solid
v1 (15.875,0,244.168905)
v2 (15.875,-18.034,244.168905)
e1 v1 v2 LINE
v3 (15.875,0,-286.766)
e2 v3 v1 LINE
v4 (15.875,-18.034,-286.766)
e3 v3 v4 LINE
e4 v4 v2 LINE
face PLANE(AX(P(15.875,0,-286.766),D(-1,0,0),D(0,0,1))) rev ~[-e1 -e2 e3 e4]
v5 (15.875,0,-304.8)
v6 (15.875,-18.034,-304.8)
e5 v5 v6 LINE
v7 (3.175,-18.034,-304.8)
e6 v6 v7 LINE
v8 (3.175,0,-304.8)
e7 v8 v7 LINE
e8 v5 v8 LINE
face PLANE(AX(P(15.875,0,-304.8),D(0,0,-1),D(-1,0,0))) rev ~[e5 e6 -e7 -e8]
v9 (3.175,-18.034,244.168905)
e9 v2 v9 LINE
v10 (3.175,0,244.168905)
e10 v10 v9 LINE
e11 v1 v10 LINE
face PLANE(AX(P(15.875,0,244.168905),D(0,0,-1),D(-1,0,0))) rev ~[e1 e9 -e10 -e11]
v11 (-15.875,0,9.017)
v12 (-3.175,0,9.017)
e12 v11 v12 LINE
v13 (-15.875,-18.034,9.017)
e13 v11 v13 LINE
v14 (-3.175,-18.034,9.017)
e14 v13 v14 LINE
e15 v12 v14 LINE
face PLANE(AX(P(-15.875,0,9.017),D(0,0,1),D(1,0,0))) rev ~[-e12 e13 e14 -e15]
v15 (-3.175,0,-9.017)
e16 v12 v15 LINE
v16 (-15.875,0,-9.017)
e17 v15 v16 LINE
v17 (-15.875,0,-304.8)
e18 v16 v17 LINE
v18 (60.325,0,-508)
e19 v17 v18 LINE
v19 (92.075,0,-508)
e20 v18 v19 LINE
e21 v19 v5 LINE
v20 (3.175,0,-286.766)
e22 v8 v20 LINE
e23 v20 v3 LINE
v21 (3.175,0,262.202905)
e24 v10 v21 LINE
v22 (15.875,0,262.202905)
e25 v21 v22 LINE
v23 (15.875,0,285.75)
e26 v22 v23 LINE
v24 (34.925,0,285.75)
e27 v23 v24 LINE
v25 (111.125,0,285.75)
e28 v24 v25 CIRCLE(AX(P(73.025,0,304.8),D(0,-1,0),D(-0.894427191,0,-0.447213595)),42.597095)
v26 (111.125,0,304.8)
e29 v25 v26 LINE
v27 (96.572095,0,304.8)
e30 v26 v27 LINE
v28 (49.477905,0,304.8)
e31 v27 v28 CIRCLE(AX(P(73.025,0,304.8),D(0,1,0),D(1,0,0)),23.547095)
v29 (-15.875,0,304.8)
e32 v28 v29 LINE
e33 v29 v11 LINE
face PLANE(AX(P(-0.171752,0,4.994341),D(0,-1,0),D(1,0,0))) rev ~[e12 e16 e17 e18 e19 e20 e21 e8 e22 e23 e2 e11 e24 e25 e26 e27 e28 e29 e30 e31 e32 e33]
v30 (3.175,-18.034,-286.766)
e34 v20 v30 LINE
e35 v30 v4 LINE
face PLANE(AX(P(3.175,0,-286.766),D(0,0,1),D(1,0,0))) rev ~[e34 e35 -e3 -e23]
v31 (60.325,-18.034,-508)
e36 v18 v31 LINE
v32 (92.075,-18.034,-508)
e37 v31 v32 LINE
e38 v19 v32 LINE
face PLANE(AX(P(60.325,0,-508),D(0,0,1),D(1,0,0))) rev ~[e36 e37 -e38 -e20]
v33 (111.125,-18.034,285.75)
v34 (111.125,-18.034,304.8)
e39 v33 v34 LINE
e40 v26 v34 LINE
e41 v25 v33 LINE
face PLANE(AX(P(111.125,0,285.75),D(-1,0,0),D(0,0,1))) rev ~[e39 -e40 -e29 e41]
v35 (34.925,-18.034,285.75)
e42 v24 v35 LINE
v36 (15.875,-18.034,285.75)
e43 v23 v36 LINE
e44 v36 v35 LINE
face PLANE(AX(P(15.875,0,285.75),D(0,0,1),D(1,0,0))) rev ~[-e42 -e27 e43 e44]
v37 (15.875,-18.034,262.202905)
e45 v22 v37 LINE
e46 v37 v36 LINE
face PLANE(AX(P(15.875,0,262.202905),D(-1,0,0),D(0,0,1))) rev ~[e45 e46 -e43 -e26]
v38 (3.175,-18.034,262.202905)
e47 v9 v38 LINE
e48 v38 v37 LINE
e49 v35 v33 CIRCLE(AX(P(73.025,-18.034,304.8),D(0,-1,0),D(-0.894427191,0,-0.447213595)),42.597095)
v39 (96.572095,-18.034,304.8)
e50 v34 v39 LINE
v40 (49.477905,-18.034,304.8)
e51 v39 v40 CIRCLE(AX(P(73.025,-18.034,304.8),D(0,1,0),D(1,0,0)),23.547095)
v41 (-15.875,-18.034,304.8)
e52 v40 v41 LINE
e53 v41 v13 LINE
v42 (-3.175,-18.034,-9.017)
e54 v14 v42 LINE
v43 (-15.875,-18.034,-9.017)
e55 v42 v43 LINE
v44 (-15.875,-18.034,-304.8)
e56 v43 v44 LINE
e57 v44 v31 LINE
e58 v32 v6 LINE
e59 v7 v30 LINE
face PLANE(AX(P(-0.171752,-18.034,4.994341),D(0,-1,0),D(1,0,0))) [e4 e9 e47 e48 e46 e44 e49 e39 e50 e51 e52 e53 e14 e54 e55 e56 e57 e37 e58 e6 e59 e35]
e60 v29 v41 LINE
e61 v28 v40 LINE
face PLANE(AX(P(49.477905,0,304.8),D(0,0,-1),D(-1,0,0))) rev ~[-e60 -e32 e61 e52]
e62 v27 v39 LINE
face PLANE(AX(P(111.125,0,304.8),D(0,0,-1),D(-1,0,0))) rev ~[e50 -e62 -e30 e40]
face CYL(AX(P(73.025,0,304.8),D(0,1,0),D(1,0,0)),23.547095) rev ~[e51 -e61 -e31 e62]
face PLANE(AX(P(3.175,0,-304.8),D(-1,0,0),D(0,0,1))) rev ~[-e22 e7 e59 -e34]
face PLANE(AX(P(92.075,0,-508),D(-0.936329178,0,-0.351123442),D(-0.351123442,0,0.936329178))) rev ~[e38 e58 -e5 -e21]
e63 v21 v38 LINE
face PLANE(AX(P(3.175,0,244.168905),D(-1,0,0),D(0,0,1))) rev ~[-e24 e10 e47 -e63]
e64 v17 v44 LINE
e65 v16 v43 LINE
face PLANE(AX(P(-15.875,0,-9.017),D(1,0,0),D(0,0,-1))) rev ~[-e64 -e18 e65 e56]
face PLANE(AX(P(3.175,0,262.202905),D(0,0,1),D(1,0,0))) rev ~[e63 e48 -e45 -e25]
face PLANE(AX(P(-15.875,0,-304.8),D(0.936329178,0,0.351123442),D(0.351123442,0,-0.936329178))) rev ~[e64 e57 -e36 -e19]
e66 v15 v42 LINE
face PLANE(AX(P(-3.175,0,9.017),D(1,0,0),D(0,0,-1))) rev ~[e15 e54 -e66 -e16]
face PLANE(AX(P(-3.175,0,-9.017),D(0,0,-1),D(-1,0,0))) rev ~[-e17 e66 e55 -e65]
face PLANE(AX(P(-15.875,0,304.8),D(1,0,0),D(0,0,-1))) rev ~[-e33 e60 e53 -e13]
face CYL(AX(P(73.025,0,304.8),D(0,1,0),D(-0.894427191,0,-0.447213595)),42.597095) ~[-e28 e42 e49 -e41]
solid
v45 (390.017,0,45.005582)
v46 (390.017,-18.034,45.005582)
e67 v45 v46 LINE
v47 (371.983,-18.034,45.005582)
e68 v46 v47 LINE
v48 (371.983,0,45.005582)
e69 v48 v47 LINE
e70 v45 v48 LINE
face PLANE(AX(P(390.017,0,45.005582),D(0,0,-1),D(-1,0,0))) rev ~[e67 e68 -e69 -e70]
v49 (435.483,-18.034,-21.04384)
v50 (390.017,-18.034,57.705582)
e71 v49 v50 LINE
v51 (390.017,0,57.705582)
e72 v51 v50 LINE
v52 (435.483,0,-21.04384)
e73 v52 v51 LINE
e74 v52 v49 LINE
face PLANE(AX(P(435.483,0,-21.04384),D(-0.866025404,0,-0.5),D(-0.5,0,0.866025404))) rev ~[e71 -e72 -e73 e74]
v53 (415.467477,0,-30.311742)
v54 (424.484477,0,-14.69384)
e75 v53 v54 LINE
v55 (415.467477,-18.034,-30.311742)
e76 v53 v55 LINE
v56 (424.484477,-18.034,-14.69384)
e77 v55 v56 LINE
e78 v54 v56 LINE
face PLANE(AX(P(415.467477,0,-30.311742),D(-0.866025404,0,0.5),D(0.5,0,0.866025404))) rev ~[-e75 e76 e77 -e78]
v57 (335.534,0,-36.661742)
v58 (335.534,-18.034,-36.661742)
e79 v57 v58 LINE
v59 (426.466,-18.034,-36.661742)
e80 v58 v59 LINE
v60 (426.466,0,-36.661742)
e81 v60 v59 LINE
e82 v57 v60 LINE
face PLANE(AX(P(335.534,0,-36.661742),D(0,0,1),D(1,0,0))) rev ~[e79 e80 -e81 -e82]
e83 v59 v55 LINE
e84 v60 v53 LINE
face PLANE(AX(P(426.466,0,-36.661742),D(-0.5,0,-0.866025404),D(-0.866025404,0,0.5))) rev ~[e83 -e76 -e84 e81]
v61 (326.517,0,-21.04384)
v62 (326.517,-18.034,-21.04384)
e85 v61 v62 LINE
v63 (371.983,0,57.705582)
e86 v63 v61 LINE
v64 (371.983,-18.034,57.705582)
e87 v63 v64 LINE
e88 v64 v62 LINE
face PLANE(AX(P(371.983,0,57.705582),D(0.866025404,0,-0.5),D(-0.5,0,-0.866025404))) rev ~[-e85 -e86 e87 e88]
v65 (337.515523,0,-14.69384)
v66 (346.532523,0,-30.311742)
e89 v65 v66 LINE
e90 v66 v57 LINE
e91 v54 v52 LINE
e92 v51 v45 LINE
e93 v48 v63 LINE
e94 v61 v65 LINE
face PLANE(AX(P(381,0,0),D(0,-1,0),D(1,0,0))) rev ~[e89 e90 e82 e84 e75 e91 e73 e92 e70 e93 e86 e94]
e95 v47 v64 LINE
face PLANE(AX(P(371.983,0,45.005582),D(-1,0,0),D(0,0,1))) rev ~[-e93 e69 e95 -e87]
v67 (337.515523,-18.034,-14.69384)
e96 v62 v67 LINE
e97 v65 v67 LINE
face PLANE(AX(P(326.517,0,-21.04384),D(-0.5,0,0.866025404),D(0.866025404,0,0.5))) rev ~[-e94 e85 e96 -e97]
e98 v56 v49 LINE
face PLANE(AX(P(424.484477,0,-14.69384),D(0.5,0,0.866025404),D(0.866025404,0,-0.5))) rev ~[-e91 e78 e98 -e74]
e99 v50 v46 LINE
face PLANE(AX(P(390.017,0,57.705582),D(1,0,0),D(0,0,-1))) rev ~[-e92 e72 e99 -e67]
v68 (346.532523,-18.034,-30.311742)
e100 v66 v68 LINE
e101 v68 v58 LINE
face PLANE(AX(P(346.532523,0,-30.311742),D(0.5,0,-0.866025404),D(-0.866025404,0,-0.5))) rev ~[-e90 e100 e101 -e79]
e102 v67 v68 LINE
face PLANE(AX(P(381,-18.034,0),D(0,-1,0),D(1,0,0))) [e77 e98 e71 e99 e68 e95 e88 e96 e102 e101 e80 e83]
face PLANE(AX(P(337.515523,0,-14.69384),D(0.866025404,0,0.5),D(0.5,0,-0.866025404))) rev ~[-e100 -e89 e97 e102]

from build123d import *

# Parameters (mm, degrees)
F1_W     = 19.05
F1_H     = 19.05
F2_DEPTH = 18.034


# Not quite as in the source:
# - a variable given as a bare number and used for a length is read in inches; the dataset says mm whatever the document's units were


with BuildPart() as f2:
    # F1 (on Front) → F2 (new body)
    with BuildSketch(Plane.XZ):
        Polygon((15.875, 285.75), (15.875, 304.8), (-15.875, 304.8), (-15.875, 9.017), (-3.175, 9.017), (-3.175, 0), (-3.175, -9.017), (-15.875, -9.017), (-15.875, -304.8), (3.175, -304.8), (3.175, -286.766), (15.875, -286.766), (15.875, 244.1689050286), (3.175, 244.1689050286), (3.175, 262.2029050286), (15.875, 262.2029050286), align=None)
        with BuildLine():
            Line((49.4779050286, 304.8), (34.925, 304.8))
            Line((34.925, 304.8), (34.925, 285.75))
            ThreePointArc((34.925, 285.75), (73.025, 262.2029050286), (111.125, 285.75))
            Line((111.125, 285.75), (111.125, 304.8))
            Line((111.125, 304.8), (96.5720949714, 304.8))
            ThreePointArc((96.5720949714, 304.8), (73.025, 281.2529050286), (49.4779050286, 304.8))
        make_face()
        with Locations((25.4, 295.275)):
            Rectangle(F1_W, F1_H)
        Polygon((3.175, -304.8), (-15.875, -304.8), (60.325, -508), (92.075, -508), (15.875, -304.8), align=None)
    extrude(amount=F2_DEPTH)


with BuildPart() as f2b:
    # F1 (on Front) → F2, piece 2 (new body)
    with BuildSketch(Plane.XZ):
        Polygon((435.483, -21.0438399617), (390.017, 57.7055820552), (390.017, 45.0055820552), (371.983, 45.0055820552), (371.983, 57.7055820552), (326.517, -21.0438399617), (337.5155226281, -14.6938399617), (346.5325226281, -30.3117420935), (335.534, -36.6617420935), (426.466, -36.6617420935), (415.4674773719, -30.3117420935), (424.4844773719, -14.6938399617), align=None)
    extrude(amount=F2_DEPTH)


solid = Compound([f2.part, f2b.part])
